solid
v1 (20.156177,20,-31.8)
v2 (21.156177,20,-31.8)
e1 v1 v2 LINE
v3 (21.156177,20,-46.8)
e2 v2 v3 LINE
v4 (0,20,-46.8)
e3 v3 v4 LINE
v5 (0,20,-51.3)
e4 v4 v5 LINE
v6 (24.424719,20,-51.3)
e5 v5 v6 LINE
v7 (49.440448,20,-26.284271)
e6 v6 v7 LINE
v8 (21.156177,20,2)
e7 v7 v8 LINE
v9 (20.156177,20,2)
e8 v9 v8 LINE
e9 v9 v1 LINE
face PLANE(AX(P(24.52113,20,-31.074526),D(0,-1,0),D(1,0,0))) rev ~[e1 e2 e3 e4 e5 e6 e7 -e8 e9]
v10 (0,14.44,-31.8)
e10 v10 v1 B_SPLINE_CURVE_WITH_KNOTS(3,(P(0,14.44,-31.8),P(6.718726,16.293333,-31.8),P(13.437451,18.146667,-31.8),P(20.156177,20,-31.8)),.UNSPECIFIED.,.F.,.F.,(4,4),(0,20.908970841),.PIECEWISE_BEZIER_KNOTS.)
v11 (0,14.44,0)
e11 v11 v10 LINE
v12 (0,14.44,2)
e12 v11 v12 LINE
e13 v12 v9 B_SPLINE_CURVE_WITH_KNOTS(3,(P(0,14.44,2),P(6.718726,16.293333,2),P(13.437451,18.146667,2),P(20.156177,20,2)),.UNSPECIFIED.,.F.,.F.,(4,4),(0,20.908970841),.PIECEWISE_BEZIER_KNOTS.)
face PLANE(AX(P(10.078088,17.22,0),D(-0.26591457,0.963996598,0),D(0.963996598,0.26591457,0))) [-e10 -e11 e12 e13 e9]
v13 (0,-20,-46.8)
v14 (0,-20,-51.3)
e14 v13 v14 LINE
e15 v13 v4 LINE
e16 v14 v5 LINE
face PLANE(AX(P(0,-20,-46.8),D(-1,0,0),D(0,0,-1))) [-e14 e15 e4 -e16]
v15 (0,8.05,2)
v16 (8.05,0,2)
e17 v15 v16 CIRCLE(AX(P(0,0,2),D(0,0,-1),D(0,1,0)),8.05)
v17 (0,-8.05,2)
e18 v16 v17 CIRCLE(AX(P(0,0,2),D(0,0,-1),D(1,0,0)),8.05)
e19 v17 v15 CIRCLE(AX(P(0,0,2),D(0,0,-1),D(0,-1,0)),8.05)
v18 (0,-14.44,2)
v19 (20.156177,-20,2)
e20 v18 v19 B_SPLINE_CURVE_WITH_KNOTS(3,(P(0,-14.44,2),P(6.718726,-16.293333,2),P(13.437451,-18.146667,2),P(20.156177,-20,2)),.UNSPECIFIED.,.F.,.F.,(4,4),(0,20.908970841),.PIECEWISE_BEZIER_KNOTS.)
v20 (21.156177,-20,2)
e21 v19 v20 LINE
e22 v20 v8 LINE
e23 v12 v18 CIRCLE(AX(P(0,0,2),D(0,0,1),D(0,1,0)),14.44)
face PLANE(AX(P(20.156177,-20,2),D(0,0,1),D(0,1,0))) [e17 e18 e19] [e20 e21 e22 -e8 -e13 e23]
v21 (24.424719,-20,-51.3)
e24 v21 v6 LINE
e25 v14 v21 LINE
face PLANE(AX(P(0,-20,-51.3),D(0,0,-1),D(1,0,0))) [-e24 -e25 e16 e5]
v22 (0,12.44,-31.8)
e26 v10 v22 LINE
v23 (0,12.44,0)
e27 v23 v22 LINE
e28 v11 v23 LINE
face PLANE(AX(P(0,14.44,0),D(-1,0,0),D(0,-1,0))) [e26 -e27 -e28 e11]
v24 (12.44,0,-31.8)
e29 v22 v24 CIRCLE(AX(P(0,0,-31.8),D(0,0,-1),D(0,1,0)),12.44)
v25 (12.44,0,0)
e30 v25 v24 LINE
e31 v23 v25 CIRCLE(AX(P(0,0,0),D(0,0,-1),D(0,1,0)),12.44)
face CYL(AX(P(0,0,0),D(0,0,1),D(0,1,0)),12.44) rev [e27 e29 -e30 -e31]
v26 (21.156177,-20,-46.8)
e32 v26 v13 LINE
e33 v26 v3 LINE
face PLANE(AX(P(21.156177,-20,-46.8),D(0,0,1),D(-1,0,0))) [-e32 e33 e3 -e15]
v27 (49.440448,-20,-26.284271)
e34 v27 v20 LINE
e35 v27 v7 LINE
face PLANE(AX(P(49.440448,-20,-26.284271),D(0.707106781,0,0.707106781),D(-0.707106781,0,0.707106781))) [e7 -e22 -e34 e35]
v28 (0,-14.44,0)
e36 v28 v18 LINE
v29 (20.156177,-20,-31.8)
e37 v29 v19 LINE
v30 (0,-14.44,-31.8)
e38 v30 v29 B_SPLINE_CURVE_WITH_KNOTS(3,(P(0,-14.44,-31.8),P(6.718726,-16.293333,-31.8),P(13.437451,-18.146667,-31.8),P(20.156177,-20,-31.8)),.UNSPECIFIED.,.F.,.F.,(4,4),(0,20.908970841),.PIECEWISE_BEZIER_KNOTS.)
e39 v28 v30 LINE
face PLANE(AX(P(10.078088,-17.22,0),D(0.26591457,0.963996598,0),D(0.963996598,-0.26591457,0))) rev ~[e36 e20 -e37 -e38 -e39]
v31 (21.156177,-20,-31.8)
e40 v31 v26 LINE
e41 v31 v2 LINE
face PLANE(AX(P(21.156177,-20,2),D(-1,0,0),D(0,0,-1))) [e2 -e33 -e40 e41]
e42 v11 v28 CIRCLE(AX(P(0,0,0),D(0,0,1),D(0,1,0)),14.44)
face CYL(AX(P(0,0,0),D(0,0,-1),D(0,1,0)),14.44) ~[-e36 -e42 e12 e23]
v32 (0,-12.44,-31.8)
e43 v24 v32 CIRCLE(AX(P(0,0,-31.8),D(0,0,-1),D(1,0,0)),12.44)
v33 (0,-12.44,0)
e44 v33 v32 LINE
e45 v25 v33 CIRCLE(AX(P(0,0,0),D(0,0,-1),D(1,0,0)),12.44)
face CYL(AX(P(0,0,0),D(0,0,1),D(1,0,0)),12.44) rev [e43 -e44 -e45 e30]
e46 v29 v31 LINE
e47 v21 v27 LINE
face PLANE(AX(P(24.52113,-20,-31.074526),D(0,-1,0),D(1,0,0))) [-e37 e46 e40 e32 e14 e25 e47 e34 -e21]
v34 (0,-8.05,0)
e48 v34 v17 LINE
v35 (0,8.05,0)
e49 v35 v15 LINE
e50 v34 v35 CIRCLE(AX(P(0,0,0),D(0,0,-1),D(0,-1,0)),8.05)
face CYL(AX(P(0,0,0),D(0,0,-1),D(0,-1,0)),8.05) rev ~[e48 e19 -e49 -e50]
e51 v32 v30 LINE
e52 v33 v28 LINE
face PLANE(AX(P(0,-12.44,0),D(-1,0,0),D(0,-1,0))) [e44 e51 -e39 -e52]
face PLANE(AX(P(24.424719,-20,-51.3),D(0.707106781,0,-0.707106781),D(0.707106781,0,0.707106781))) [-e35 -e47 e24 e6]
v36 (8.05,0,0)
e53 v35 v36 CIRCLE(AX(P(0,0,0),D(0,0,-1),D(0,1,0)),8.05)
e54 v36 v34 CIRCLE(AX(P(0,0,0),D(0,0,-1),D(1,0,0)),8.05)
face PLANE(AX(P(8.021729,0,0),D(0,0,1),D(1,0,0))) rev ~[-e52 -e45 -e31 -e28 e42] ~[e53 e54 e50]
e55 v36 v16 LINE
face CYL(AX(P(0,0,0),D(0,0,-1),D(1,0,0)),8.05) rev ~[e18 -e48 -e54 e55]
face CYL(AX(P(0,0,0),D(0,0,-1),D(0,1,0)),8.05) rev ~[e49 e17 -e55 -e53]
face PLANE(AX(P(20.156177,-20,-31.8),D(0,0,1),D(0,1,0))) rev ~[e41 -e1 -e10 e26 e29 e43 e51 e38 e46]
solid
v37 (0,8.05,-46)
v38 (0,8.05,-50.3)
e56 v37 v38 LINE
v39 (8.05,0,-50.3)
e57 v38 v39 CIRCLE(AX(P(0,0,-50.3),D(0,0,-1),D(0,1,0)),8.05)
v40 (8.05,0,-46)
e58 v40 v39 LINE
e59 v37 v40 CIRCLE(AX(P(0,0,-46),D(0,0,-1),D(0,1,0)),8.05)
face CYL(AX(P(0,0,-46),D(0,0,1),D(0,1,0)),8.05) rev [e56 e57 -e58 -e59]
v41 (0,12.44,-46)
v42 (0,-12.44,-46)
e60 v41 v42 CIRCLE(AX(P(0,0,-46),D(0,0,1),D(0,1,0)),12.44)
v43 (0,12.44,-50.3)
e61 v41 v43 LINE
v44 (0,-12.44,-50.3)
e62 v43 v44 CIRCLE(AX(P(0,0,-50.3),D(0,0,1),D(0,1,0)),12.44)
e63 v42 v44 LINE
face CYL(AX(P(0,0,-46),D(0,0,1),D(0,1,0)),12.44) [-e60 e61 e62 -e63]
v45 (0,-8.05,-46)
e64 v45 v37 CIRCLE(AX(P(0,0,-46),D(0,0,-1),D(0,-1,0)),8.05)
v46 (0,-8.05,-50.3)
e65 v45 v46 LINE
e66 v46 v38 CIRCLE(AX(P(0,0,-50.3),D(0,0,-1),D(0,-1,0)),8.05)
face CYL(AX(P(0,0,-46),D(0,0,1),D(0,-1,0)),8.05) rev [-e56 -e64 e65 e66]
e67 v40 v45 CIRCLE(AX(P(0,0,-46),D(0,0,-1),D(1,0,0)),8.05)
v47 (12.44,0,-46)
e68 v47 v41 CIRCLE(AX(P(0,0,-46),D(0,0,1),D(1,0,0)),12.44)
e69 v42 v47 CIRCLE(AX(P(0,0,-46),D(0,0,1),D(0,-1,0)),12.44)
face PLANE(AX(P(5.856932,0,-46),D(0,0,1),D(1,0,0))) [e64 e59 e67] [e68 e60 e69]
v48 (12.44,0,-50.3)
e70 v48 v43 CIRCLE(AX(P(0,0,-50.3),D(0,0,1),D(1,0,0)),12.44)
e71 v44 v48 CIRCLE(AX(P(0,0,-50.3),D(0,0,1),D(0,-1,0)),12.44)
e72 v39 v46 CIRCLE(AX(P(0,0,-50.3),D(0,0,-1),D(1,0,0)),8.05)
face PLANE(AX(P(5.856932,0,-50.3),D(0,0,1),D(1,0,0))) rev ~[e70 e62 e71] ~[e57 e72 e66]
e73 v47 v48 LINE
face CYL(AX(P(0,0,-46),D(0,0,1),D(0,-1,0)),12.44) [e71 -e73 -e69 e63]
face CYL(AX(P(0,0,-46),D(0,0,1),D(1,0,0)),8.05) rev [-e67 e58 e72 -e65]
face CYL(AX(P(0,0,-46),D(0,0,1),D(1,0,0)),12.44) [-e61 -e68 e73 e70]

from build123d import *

# Parameters (mm, degrees)
F1_DEPTH = 31.8
F2_DEPTH = 31.8
F3_DEPTH = 2
F4_DEPTH = 1
F6_START = -46
F6_DEPTH = 4.3
F7_DEPTH = 40


with BuildPart() as f1:
    # F0 (on Top) → F1 (new body)
    with BuildSketch(Plane.XY):
        with BuildLine():
            ThreePointArc((0, 12.44), (8.796408358, 8.796408358), (12.44, 0))
            ThreePointArc((12.44, 0), (8.796408358, -8.796408358), (0, -12.44))
            Line((0, -12.44), (0, -14.44))
            ThreePointArc((0, -14.44), (10.2106219203, -10.2106219203), (14.44, 0))
            ThreePointArc((14.44, 0), (10.2106219203, 10.2106219203), (0, 14.44))
            Line((0, 14.44), (0, 12.44))
        make_face()
    extrude(amount=-F1_DEPTH)

    # F0 (on Top) → F2 (join)
    with BuildSketch(Plane.XY):
        with BuildLine():
            add(Edge.make_bspline(
                [(0, 14.44), (6.7187255869, 16.2933333333), (13.4374511739, 18.1466666667), (20.1561767608, 20)],
                knots=[0, 0, 0, 0, 20.9089708406, 20.9089708406, 20.9089708406, 20.9089708406], degree=3))
            ThreePointArc((0, 14.44), (10.2106219203, 10.2106219203), (14.44, 0))
            ThreePointArc((14.44, 0), (10.2106219203, -10.2106219203), (0, -14.44))
            add(Edge.make_bspline(
                [(0, -14.44), (6.7187255869, -16.2933333333), (13.4374511739, -18.1466666667), (20.1561767608, -20)],
                knots=[0, 0, 0, 0, 20.9089708406, 20.9089708406, 20.9089708406, 20.9089708406], degree=3))
            Line((20.1561767608, -20), (20.1561767608, 20))
        make_face()
    extrude(amount=-F2_DEPTH)

    # F0 (on Top) → F3 (join)
    with BuildSketch(Plane.XY):
        with BuildLine():
            ThreePointArc((0, 12.44), (8.796408358, 8.796408358), (12.44, 0))
            ThreePointArc((12.44, 0), (8.796408358, -8.796408358), (0, -12.44))
            Line((0, -12.44), (0, -14.44))
            ThreePointArc((0, -14.44), (10.2106219203, -10.2106219203), (14.44, 0))
            ThreePointArc((14.44, 0), (10.2106219203, 10.2106219203), (0, 14.44))
            Line((0, 14.44), (0, 12.44))
        make_face()
        with BuildLine():
            ThreePointArc((0, -12.44), (8.796408358, -8.796408358), (12.44, 0))
            ThreePointArc((12.44, 0), (8.796408358, 8.796408358), (0, 12.44))
            Line((0, 12.44), (0, 8.05))
            ThreePointArc((0, 8.05), (5.6922095886, 5.6922095886), (8.05, 0))
            ThreePointArc((8.05, 0), (5.6922095886, -5.6922095886), (0, -8.05))
            Line((0, -8.05), (0, -12.44))
        make_face()
        with BuildLine():
            Line((0, 8.05), (0, 12.44))
            ThreePointArc((0, 12.44), (-12.44, 0), (0, -12.44))
            Line((0, -12.44), (0, -8.05))
            ThreePointArc((0, -8.05), (-8.05, 0), (0, 8.05))
        make_face()
        with BuildLine():
            ThreePointArc((0, -12.44), (-12.44, 0), (0, 12.44))
            Line((0, 12.44), (0, 14.44))
            ThreePointArc((0, 14.44), (-14.44, 0), (0, -14.44))
            Line((0, -14.44), (0, -12.44))
        make_face()
        with BuildLine():
            add(Edge.make_bspline(
                [(0, 14.44), (6.7187255869, 16.2933333333), (13.4374511739, 18.1466666667), (20.1561767608, 20)],
                knots=[0, 0, 0, 0, 20.9089708406, 20.9089708406, 20.9089708406, 20.9089708406], degree=3))
            ThreePointArc((0, 14.44), (10.2106219203, 10.2106219203), (14.44, 0))
            ThreePointArc((14.44, 0), (10.2106219203, -10.2106219203), (0, -14.44))
            add(Edge.make_bspline(
                [(0, -14.44), (6.7187255869, -16.2933333333), (13.4374511739, -18.1466666667), (20.1561767608, -20)],
                knots=[0, 0, 0, 0, 20.9089708406, 20.9089708406, 20.9089708406, 20.9089708406], degree=3))
            Line((20.1561767608, -20), (20.1561767608, 20))
        make_face()
    extrude(amount=F3_DEPTH)

    # F4 (add): a face of the model
    f4_faces = [f1.faces().sort_by_distance(p)[0] for p in [
        (20.1561767608, 0, -14.9),
    ]]
    extrude(f4_faces, amount=F4_DEPTH)

    # F5 (on face) → F7 (join, through all)
    with BuildSketch(Plane.XZ.offset(20)):
        Polygon((49.4404480083, -26.2842712475), (21.1561767608, 2), (21.1561767608, -31.8), (21.1561767608, -46.8), (0, -46.8), (0, -51.3), (24.4247192557, -51.3), align=None)
    extrude(amount=-F7_DEPTH)


with BuildPart() as f6:
    # F0 (on Top) → F6 (new body)
    with BuildSketch(Plane.XY.offset(F6_START)):
        with BuildLine():
            ThreePointArc((0, -12.44), (8.796408358, -8.796408358), (12.44, 0))
            ThreePointArc((12.44, 0), (8.796408358, 8.796408358), (0, 12.44))
            Line((0, 12.44), (0, 8.05))
            ThreePointArc((0, 8.05), (5.6922095886, 5.6922095886), (8.05, 0))
            ThreePointArc((8.05, 0), (5.6922095886, -5.6922095886), (0, -8.05))
            Line((0, -8.05), (0, -12.44))
        make_face()
        with BuildLine():
            Line((0, 8.05), (0, 12.44))
            ThreePointArc((0, 12.44), (-12.44, 0), (0, -12.44))
            Line((0, -12.44), (0, -8.05))
            ThreePointArc((0, -8.05), (-8.05, 0), (0, 8.05))
        make_face()
    extrude(amount=-F6_DEPTH)


solid = Compound([f1.part, f6.part])
